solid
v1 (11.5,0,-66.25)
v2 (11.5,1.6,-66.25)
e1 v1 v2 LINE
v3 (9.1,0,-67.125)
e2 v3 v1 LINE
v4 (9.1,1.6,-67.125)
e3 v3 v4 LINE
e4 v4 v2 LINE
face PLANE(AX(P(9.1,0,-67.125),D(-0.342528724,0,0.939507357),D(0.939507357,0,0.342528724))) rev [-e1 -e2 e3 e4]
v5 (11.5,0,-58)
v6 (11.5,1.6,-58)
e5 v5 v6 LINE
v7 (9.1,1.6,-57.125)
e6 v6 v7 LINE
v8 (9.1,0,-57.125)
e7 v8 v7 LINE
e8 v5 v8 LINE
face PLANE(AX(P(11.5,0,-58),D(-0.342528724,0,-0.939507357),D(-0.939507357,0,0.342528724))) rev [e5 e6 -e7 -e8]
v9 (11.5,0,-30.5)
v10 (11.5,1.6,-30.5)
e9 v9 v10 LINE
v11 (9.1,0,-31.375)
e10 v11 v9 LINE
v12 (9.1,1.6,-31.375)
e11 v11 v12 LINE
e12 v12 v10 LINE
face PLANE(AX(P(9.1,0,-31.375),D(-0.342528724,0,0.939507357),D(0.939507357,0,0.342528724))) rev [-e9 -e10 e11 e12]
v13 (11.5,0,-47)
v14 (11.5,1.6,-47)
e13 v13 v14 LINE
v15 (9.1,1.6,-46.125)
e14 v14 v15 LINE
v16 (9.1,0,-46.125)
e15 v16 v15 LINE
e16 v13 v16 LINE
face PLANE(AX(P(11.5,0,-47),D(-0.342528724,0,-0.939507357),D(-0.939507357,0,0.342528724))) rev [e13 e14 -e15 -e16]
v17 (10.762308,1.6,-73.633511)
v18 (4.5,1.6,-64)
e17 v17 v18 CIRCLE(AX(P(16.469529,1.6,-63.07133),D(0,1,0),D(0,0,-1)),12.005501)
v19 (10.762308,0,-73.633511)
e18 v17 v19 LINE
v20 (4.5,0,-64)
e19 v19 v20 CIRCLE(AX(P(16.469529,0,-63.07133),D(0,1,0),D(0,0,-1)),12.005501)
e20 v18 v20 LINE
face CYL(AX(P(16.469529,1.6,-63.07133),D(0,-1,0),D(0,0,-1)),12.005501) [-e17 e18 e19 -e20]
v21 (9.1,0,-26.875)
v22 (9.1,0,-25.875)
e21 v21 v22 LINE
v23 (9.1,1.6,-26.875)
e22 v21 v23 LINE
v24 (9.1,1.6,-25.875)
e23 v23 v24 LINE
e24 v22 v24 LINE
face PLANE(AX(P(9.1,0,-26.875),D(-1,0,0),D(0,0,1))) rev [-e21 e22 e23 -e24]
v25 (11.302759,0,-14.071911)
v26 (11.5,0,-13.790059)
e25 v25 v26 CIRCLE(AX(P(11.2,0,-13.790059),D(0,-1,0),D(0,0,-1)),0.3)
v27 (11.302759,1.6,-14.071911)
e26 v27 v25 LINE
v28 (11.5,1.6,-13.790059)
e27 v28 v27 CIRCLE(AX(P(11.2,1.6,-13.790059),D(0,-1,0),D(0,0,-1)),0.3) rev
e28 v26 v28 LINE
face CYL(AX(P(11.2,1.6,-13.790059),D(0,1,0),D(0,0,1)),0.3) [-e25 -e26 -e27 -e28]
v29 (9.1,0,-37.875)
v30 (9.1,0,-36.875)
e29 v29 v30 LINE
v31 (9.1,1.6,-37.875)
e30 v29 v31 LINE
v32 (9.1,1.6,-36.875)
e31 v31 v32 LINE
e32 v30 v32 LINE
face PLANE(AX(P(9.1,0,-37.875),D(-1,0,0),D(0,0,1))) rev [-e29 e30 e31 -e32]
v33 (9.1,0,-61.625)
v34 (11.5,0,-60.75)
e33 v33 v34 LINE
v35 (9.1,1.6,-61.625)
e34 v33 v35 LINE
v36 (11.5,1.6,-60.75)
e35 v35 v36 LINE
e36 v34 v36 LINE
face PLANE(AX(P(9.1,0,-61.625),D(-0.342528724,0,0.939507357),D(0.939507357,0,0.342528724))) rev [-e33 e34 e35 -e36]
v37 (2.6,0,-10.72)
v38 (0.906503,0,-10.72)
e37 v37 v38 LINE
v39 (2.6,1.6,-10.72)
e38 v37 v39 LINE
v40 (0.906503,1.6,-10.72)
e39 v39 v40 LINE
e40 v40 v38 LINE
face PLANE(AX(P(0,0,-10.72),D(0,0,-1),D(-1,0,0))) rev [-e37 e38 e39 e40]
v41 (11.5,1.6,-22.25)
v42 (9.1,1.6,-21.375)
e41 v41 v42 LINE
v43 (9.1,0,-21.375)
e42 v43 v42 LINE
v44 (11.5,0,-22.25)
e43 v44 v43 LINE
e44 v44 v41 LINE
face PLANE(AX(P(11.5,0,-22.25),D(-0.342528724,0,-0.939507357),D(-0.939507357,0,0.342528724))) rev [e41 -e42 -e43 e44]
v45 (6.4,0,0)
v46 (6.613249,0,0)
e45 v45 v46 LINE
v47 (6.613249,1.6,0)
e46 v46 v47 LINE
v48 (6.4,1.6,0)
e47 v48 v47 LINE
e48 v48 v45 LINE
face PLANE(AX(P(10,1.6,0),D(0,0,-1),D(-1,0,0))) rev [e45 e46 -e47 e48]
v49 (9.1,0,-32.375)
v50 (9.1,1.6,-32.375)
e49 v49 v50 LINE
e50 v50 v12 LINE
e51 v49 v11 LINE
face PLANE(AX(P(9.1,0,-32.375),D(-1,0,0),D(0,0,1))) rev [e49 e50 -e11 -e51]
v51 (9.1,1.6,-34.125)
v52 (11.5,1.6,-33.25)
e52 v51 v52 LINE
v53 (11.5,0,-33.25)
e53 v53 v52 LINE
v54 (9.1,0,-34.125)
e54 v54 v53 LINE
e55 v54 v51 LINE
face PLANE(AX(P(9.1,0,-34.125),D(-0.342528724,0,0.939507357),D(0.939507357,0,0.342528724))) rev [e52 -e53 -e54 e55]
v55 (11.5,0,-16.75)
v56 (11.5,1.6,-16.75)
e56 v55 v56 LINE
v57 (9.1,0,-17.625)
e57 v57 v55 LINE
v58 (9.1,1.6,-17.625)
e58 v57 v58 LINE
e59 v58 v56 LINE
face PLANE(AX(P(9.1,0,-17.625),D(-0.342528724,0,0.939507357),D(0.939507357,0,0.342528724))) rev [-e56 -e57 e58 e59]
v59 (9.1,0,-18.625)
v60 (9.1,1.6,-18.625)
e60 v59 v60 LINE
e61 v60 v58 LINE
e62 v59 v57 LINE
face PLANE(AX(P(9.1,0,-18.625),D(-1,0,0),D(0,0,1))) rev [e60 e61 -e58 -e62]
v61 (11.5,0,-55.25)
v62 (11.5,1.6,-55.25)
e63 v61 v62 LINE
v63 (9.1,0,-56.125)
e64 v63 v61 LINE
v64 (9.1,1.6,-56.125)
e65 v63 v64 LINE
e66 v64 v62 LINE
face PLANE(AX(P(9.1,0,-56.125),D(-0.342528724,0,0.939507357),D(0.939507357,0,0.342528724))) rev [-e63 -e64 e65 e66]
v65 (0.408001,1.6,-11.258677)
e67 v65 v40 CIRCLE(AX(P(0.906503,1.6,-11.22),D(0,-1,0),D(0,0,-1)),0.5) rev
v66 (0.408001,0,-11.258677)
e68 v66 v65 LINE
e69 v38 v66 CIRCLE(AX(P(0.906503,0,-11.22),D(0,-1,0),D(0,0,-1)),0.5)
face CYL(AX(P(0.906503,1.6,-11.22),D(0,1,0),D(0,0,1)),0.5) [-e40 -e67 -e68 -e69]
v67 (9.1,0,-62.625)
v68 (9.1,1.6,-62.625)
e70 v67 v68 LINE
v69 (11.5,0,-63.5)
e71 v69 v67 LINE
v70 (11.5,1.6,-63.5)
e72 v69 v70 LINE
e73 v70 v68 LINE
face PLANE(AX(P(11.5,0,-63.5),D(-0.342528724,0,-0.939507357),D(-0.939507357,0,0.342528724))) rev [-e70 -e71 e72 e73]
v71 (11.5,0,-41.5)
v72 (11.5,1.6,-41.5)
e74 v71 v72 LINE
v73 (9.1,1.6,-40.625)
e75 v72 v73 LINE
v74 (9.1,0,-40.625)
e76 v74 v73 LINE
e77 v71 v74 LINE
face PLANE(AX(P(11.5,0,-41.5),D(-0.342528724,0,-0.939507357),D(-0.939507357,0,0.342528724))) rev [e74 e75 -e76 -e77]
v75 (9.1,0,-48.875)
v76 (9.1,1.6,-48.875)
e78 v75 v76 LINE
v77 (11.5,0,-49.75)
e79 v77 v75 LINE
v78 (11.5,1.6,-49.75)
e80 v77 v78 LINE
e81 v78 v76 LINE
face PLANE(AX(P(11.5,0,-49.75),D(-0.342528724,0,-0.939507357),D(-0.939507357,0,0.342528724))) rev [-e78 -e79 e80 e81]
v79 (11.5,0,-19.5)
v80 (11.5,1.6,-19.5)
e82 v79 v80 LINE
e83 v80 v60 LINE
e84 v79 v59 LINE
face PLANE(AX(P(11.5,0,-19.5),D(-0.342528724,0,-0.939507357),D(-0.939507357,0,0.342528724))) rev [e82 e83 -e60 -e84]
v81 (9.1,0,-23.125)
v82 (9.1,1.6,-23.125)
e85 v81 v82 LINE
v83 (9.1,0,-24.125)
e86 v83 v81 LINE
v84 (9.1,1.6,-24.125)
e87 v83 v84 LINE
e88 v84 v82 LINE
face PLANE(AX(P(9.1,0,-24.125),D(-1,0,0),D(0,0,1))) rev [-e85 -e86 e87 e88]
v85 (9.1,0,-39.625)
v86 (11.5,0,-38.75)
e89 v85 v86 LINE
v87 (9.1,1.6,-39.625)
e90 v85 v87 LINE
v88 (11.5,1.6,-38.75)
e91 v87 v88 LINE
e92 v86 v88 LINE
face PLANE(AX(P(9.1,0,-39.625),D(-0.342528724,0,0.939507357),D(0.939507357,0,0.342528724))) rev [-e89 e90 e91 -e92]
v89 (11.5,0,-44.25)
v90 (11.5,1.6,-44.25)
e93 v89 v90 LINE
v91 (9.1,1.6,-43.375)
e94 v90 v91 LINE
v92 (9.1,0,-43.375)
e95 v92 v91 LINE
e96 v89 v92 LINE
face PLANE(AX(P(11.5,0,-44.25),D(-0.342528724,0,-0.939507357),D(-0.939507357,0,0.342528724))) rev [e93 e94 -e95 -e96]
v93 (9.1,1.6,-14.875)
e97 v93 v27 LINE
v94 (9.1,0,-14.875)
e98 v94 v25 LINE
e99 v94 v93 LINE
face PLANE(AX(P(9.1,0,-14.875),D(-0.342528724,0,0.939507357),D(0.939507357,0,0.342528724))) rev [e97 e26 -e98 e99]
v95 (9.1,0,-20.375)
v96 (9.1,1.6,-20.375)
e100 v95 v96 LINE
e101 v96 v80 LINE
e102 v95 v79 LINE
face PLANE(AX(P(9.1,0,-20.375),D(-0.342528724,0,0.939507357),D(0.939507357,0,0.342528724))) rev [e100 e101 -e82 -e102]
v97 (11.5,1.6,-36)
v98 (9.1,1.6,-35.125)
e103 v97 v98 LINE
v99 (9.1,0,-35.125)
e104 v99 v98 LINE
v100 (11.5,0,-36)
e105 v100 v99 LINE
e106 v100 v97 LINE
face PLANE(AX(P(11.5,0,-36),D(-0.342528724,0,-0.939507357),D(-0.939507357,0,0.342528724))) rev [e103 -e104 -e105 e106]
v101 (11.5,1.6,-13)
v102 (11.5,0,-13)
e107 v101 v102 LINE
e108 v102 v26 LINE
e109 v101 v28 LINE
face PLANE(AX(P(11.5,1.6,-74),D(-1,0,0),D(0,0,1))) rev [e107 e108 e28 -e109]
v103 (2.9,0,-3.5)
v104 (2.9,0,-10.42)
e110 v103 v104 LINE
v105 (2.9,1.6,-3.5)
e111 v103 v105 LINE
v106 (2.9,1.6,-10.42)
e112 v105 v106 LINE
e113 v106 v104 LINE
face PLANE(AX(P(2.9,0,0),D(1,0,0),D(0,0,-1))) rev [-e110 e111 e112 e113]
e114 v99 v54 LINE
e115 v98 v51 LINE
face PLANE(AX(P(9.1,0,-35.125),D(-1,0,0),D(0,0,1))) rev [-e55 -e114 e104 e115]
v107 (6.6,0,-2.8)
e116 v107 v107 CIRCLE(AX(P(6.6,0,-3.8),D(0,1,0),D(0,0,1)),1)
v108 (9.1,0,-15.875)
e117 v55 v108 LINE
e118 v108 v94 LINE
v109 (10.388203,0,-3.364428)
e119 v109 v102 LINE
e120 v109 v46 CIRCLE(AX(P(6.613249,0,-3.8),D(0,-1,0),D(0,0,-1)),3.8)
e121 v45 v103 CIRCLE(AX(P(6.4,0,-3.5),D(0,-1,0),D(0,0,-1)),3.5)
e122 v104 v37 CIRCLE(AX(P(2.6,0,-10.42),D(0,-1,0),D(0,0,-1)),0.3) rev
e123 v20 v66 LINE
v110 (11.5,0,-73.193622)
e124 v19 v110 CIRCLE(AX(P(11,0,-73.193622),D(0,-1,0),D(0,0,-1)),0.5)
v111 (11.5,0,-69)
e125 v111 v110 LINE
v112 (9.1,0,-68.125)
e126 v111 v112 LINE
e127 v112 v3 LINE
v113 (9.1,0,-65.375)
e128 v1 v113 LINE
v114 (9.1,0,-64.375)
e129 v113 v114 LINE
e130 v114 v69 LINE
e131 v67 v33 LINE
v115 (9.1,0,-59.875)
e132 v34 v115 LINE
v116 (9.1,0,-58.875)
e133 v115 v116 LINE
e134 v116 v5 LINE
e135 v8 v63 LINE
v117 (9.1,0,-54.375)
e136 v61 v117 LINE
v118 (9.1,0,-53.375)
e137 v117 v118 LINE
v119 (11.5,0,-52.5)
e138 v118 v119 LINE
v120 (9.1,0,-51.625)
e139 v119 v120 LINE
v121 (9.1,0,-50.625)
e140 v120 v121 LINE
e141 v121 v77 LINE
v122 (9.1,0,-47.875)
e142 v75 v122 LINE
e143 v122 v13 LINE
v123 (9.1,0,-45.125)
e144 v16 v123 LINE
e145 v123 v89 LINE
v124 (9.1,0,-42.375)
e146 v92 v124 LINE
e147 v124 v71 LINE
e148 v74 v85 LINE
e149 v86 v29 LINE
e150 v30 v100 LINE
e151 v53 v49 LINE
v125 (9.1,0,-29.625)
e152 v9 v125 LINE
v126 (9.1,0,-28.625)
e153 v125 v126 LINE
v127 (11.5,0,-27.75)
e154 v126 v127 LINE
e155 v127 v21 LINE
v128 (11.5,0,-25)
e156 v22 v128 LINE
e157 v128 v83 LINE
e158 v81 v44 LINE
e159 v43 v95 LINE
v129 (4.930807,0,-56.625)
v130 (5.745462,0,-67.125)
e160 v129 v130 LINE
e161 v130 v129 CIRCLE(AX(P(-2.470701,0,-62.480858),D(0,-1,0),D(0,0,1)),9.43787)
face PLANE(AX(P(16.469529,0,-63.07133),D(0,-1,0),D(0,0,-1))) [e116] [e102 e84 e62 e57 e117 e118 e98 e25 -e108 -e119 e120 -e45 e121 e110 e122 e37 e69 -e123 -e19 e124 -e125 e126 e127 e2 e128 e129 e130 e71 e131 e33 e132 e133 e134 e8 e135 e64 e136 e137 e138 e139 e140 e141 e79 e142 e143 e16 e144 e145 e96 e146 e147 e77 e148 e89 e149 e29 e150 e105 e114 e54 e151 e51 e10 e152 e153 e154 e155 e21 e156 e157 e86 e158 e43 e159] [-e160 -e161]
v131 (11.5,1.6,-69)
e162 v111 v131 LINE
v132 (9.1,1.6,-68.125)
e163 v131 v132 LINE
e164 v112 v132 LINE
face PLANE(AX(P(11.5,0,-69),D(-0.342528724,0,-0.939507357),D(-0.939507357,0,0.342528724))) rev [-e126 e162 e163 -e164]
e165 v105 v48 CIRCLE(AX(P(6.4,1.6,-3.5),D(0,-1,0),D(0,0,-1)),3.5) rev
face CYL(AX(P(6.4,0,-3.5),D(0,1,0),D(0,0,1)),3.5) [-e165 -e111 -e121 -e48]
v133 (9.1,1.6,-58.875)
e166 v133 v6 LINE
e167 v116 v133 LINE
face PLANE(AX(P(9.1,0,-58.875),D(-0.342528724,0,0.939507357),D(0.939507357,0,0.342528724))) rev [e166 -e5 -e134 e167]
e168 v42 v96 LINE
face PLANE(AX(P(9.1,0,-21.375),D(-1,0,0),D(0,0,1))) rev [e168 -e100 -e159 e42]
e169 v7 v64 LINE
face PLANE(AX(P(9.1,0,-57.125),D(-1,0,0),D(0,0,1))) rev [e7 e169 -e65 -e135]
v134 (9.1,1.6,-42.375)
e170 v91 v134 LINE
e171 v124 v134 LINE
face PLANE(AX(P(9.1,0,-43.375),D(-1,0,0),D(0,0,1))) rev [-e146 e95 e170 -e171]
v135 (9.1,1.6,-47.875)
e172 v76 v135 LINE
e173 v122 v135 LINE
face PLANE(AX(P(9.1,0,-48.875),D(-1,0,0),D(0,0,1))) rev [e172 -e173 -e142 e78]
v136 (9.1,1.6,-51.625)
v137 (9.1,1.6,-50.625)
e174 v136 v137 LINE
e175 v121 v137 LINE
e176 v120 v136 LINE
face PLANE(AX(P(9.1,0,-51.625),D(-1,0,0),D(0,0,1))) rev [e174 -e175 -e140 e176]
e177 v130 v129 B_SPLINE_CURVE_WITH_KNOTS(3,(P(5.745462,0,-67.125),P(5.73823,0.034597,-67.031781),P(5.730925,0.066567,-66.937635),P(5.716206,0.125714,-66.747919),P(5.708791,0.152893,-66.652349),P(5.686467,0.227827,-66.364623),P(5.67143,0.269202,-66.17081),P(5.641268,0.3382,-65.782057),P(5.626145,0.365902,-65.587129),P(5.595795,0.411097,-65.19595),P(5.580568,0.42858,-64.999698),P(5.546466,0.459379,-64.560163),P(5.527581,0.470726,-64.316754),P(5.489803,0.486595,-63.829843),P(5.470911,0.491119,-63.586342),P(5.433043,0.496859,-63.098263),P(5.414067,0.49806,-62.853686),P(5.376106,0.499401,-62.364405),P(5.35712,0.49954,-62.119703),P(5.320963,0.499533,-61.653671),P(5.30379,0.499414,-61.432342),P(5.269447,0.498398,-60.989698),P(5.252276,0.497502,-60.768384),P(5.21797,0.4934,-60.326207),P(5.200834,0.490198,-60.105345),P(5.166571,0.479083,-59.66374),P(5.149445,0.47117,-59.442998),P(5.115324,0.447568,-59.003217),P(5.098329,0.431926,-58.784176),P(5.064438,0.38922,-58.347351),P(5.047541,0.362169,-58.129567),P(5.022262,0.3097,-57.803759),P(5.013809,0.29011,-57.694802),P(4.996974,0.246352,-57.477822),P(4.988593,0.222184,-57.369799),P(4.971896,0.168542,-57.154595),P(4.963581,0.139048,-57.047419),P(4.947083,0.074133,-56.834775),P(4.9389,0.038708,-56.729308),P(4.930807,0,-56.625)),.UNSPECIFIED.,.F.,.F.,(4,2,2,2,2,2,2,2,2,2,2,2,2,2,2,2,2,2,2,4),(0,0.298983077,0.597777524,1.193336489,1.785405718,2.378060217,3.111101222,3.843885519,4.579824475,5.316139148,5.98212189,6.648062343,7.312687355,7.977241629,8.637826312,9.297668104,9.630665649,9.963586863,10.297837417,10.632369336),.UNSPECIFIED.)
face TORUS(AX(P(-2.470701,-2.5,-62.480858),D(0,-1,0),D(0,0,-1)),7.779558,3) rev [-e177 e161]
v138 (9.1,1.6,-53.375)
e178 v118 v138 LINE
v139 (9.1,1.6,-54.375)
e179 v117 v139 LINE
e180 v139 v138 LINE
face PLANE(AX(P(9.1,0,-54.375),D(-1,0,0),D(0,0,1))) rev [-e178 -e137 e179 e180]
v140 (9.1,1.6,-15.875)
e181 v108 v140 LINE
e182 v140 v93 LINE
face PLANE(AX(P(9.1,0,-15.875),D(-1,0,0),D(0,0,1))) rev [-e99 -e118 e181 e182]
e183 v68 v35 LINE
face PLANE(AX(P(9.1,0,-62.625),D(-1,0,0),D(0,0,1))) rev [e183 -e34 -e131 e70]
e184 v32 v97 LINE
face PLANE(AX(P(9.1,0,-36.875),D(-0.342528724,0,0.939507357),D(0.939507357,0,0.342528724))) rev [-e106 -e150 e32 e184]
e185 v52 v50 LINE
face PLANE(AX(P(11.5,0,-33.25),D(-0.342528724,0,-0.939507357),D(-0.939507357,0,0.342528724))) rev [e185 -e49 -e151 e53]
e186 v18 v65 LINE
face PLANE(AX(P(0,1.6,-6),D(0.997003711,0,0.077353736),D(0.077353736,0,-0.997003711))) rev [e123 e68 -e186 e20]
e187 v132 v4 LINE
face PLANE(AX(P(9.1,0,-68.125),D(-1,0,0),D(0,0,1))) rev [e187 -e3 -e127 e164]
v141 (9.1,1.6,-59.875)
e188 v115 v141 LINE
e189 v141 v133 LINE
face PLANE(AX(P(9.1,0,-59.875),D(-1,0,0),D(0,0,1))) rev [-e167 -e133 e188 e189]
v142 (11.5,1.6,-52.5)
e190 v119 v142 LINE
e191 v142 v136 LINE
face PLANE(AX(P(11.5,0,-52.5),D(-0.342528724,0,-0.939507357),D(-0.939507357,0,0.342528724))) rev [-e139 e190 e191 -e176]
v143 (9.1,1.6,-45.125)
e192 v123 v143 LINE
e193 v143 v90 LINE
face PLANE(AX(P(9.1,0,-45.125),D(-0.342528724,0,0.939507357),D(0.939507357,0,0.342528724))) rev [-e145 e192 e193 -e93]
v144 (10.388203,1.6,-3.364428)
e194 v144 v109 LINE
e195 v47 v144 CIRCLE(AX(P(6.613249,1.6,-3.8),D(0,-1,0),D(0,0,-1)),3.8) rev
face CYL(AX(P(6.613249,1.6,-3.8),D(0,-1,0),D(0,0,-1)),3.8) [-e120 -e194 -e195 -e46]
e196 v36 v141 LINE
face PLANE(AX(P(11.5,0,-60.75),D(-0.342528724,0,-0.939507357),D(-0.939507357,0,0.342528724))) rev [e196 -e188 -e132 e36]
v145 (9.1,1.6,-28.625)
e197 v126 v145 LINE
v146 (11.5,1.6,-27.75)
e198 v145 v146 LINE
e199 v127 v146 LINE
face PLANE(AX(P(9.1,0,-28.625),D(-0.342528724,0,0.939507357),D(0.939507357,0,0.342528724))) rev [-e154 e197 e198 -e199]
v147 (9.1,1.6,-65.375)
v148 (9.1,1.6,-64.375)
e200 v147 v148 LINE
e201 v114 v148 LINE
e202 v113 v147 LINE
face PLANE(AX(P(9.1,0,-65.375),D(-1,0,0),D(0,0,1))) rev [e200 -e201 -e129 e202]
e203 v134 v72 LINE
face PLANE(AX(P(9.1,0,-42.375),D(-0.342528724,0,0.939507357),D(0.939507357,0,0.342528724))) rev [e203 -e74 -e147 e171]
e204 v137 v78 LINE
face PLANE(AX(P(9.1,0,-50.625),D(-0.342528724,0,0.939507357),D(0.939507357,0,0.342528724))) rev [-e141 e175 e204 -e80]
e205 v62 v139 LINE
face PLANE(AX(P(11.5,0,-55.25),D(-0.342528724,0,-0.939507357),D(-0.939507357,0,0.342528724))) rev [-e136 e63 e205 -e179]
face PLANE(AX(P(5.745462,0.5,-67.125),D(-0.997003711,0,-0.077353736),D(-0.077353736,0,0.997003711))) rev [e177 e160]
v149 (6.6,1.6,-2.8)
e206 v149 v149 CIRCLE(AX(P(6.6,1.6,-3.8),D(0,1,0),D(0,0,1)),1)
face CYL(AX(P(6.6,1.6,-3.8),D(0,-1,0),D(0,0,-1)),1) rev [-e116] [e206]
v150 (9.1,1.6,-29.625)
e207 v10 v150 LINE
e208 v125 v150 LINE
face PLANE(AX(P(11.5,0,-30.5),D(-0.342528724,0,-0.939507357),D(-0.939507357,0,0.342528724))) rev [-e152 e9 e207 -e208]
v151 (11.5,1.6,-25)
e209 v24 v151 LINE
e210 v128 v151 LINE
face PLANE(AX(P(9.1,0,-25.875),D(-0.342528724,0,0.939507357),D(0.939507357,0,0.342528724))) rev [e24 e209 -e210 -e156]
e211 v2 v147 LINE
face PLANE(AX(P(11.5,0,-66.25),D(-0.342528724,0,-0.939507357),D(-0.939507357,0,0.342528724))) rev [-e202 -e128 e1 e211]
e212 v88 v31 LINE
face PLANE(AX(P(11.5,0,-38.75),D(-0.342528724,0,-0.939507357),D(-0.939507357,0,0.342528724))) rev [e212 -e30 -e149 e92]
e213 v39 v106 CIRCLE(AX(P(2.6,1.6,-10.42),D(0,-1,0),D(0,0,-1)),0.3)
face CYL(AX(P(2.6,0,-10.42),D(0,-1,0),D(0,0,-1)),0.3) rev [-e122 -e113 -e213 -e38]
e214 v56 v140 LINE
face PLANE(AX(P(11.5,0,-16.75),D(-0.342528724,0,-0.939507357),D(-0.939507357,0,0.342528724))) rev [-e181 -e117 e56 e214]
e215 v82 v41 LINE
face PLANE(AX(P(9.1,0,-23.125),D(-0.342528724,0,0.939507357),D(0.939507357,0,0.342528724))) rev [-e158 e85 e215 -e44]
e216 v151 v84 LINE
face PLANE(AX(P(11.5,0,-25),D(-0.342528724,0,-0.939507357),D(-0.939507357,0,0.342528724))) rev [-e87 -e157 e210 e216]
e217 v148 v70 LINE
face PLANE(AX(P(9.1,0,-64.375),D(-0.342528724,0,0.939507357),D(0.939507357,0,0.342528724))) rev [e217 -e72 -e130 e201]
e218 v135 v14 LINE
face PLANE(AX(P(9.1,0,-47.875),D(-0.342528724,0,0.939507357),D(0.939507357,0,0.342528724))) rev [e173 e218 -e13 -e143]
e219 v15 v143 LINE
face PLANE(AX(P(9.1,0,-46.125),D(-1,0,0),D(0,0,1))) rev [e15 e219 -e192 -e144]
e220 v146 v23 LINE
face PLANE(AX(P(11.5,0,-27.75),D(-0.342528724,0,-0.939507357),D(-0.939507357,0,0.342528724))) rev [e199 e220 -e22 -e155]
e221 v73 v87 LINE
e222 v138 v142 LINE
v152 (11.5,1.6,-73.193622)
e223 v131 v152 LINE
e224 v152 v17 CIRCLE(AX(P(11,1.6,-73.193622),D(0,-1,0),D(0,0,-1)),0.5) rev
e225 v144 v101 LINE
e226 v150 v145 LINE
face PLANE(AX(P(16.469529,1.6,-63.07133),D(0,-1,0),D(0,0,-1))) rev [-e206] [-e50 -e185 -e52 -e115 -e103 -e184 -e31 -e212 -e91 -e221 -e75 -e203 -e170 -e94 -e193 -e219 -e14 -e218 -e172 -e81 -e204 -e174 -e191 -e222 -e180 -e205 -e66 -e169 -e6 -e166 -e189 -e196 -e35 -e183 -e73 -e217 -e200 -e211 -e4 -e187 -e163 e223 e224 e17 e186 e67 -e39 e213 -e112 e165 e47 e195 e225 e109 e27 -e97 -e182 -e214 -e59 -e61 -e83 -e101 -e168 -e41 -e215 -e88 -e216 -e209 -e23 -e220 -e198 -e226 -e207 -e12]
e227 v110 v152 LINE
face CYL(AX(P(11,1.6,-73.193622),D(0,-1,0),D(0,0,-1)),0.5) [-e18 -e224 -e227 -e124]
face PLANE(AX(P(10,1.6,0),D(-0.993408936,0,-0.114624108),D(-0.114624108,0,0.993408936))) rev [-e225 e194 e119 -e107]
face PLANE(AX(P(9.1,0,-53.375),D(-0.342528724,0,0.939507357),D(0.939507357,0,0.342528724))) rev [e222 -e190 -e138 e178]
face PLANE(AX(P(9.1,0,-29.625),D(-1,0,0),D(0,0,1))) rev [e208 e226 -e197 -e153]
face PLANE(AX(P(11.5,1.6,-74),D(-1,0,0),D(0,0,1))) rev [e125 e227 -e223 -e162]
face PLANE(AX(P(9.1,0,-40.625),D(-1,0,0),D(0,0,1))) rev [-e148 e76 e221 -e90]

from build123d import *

# Parameters (mm, degrees)
SKETCH2_R           = 1
BOSS_EXTRUDE1_DEPTH = 1.6
FILLET1_R           = 3.8
SKETCH3_W           = 2.9
SKETCH3_H           = 10.72
CUT_EXTRUDE1_DEPTH  = 75.905340264
CUT_EXTRUDE2_DEPTH  = 75.905340264
FILLET2_R           = 0.5
LPATTERN1_COUNT     = 20
LPATTERN1_PITCH     = 2.75
CUT_EXTRUDE5_DEPTH  = 0.5
FILLET3_R           = 3
FILLET4_R           = 3.5
FILLET5_R           = 0.5
FILLET6_R           = 0.3


with BuildPart() as part:
    # Sketch2 → Boss-Extrude1 (new body)
    with BuildSketch(Plane(origin=(0, 0, 0), x_dir=(1, 0, 0), z_dir=(0, 1, 0))):
        with BuildLine():
            Line((0, 0), (0, 6))
            Line((0, 6), (4.5, 64))
            ThreePointArc((4.5, 64), (6.634239414, 69.95603241), (11.5, 74))
            Line((11.5, 74), (11.5, 13))
            Line((11.5, 13), (10, 0))
            Line((10, 0), (0, 0))
        make_face()
        with Locations(Location((6.6, 3.8, 0), (0, 0, 270))):
            Circle(SKETCH2_R, mode=Mode.SUBTRACT)
    extrude(amount=BOSS_EXTRUDE1_DEPTH)

    # Fillet1
    fillet1_edges = [part.edges().sort_by_distance(p)[0] for p in [
        (10, 0.8, 0),
    ]]
    fillet(fillet1_edges, radius=FILLET1_R)

    # Sketch3 → Cut-Extrude1 (cut, through all)
    with BuildSketch(Plane(origin=(0, 1.6, 0), x_dir=(1, 0, 0), z_dir=(0, 1, 0))):
        with Locations((1.45, 5.36)):
            Rectangle(SKETCH3_W, SKETCH3_H)
    extrude(amount=-CUT_EXTRUDE1_DEPTH, mode=Mode.SUBTRACT)

    # Sketch4 → Cut-Extrude2 (cut, through all)
    with BuildSketch(Plane(origin=(0, 1.6, 0), x_dir=(1, 0, 0), z_dir=(0, 1, 0))):
        Polygon((11.5, 69), (9.1, 68.125), (9.1, 67.125), (11.5, 66.25), align=None)
    cut_extrude2 = extrude(amount=-CUT_EXTRUDE2_DEPTH, mode=Mode.SUBTRACT)

    # Fillet2
    fillet2_edges = [part.edges().sort_by_distance(p)[0] for p in [
        (11.5, 0.8, -74),
    ]]
    fillet(fillet2_edges, radius=FILLET2_R)

    # LPattern1: Cut-Extrude2 ×20
    with Locations(*[(0, 0, i * LPATTERN1_PITCH) for i in range(1, LPATTERN1_COUNT)]):
        add(cut_extrude2, mode=Mode.SUBTRACT)

    # Sketch6 → Cut-Extrude5 (cut)
    with BuildSketch(Plane.XZ):
        with BuildLine():
            Line((5.74546219, -67.125), (4.930807018, -56.625))
            ThreePointArc((4.930807018, -56.625), (6.938890592, -61.750803415), (5.74546219, -67.125))
        make_face()
    extrude(amount=-CUT_EXTRUDE5_DEPTH, mode=Mode.SUBTRACT)

    # Fillet3
    # the kernel refuses this fillet: 3 mm, written as the material it adds along each edge
    with BuildSketch(Plane(origin=(-2.470700866, 0.5, -62.480857924), x_dir=(0.44582092023827286, 0, 0.8951221743862118), z_dir=(-0.8951221743862118, 0, 0.44582092023827286))) as fillet3_piece_1_section:
        with BuildLine():
            CenterArc((7.77955765, -3), FILLET3_R, 56.442690238, 33.557309762)
            Line((7.77955765, 0), (7.77955765, 0.06))
            Line((7.77955765, 0.06), (9.437870045, 0.06))
            Line((9.437870045, 0.06), (9.497870045, 0))
            ThreePointArc((9.497870045, 0), (9.497870045, -0.25), (9.471036293, -0.45))
            Line((9.471036293, -0.45), (9.437870045, -0.5))
        make_face()
    fillet3_piece_1 = revolve(axis=Axis((-2.470700866, 0.5, -62.480857924), (0, 1, 0)), revolution_arc=118.175305081, mode=Mode.PRIVATE)
    fillet3_piece_1 = split(fillet3_piece_1, bisect_by=Plane(origin=(5.338134618, 0.375117564, -61.875000174), z_dir=(0.997003710874575, 0, 0.07735373618854458)), keep=Keep.TOP, mode=Mode.PRIVATE)
    add(fillet3_piece_1)

    # Fillet4
    fillet4_edges = [part.edges().sort_by_distance(p)[0] for p in [
        (2.9, 0.8, 0),
    ]]
    fillet(fillet4_edges, radius=FILLET4_R)

    # Fillet5
    fillet5_edges = [part.edges().sort_by_distance(p)[0] for p in [
        (0.366206897, 0.8, -10.72),
    ]]
    fillet(fillet5_edges, radius=FILLET5_R)

    # Fillet6
    fillet6_edges = [part.edges().sort_by_distance(p)[0] for p in [
        (11.5, 0.8, -14),
        (2.9, 0.8, -10.72),
    ]]
    fillet(fillet6_edges, radius=FILLET6_R)


solid = part.part
